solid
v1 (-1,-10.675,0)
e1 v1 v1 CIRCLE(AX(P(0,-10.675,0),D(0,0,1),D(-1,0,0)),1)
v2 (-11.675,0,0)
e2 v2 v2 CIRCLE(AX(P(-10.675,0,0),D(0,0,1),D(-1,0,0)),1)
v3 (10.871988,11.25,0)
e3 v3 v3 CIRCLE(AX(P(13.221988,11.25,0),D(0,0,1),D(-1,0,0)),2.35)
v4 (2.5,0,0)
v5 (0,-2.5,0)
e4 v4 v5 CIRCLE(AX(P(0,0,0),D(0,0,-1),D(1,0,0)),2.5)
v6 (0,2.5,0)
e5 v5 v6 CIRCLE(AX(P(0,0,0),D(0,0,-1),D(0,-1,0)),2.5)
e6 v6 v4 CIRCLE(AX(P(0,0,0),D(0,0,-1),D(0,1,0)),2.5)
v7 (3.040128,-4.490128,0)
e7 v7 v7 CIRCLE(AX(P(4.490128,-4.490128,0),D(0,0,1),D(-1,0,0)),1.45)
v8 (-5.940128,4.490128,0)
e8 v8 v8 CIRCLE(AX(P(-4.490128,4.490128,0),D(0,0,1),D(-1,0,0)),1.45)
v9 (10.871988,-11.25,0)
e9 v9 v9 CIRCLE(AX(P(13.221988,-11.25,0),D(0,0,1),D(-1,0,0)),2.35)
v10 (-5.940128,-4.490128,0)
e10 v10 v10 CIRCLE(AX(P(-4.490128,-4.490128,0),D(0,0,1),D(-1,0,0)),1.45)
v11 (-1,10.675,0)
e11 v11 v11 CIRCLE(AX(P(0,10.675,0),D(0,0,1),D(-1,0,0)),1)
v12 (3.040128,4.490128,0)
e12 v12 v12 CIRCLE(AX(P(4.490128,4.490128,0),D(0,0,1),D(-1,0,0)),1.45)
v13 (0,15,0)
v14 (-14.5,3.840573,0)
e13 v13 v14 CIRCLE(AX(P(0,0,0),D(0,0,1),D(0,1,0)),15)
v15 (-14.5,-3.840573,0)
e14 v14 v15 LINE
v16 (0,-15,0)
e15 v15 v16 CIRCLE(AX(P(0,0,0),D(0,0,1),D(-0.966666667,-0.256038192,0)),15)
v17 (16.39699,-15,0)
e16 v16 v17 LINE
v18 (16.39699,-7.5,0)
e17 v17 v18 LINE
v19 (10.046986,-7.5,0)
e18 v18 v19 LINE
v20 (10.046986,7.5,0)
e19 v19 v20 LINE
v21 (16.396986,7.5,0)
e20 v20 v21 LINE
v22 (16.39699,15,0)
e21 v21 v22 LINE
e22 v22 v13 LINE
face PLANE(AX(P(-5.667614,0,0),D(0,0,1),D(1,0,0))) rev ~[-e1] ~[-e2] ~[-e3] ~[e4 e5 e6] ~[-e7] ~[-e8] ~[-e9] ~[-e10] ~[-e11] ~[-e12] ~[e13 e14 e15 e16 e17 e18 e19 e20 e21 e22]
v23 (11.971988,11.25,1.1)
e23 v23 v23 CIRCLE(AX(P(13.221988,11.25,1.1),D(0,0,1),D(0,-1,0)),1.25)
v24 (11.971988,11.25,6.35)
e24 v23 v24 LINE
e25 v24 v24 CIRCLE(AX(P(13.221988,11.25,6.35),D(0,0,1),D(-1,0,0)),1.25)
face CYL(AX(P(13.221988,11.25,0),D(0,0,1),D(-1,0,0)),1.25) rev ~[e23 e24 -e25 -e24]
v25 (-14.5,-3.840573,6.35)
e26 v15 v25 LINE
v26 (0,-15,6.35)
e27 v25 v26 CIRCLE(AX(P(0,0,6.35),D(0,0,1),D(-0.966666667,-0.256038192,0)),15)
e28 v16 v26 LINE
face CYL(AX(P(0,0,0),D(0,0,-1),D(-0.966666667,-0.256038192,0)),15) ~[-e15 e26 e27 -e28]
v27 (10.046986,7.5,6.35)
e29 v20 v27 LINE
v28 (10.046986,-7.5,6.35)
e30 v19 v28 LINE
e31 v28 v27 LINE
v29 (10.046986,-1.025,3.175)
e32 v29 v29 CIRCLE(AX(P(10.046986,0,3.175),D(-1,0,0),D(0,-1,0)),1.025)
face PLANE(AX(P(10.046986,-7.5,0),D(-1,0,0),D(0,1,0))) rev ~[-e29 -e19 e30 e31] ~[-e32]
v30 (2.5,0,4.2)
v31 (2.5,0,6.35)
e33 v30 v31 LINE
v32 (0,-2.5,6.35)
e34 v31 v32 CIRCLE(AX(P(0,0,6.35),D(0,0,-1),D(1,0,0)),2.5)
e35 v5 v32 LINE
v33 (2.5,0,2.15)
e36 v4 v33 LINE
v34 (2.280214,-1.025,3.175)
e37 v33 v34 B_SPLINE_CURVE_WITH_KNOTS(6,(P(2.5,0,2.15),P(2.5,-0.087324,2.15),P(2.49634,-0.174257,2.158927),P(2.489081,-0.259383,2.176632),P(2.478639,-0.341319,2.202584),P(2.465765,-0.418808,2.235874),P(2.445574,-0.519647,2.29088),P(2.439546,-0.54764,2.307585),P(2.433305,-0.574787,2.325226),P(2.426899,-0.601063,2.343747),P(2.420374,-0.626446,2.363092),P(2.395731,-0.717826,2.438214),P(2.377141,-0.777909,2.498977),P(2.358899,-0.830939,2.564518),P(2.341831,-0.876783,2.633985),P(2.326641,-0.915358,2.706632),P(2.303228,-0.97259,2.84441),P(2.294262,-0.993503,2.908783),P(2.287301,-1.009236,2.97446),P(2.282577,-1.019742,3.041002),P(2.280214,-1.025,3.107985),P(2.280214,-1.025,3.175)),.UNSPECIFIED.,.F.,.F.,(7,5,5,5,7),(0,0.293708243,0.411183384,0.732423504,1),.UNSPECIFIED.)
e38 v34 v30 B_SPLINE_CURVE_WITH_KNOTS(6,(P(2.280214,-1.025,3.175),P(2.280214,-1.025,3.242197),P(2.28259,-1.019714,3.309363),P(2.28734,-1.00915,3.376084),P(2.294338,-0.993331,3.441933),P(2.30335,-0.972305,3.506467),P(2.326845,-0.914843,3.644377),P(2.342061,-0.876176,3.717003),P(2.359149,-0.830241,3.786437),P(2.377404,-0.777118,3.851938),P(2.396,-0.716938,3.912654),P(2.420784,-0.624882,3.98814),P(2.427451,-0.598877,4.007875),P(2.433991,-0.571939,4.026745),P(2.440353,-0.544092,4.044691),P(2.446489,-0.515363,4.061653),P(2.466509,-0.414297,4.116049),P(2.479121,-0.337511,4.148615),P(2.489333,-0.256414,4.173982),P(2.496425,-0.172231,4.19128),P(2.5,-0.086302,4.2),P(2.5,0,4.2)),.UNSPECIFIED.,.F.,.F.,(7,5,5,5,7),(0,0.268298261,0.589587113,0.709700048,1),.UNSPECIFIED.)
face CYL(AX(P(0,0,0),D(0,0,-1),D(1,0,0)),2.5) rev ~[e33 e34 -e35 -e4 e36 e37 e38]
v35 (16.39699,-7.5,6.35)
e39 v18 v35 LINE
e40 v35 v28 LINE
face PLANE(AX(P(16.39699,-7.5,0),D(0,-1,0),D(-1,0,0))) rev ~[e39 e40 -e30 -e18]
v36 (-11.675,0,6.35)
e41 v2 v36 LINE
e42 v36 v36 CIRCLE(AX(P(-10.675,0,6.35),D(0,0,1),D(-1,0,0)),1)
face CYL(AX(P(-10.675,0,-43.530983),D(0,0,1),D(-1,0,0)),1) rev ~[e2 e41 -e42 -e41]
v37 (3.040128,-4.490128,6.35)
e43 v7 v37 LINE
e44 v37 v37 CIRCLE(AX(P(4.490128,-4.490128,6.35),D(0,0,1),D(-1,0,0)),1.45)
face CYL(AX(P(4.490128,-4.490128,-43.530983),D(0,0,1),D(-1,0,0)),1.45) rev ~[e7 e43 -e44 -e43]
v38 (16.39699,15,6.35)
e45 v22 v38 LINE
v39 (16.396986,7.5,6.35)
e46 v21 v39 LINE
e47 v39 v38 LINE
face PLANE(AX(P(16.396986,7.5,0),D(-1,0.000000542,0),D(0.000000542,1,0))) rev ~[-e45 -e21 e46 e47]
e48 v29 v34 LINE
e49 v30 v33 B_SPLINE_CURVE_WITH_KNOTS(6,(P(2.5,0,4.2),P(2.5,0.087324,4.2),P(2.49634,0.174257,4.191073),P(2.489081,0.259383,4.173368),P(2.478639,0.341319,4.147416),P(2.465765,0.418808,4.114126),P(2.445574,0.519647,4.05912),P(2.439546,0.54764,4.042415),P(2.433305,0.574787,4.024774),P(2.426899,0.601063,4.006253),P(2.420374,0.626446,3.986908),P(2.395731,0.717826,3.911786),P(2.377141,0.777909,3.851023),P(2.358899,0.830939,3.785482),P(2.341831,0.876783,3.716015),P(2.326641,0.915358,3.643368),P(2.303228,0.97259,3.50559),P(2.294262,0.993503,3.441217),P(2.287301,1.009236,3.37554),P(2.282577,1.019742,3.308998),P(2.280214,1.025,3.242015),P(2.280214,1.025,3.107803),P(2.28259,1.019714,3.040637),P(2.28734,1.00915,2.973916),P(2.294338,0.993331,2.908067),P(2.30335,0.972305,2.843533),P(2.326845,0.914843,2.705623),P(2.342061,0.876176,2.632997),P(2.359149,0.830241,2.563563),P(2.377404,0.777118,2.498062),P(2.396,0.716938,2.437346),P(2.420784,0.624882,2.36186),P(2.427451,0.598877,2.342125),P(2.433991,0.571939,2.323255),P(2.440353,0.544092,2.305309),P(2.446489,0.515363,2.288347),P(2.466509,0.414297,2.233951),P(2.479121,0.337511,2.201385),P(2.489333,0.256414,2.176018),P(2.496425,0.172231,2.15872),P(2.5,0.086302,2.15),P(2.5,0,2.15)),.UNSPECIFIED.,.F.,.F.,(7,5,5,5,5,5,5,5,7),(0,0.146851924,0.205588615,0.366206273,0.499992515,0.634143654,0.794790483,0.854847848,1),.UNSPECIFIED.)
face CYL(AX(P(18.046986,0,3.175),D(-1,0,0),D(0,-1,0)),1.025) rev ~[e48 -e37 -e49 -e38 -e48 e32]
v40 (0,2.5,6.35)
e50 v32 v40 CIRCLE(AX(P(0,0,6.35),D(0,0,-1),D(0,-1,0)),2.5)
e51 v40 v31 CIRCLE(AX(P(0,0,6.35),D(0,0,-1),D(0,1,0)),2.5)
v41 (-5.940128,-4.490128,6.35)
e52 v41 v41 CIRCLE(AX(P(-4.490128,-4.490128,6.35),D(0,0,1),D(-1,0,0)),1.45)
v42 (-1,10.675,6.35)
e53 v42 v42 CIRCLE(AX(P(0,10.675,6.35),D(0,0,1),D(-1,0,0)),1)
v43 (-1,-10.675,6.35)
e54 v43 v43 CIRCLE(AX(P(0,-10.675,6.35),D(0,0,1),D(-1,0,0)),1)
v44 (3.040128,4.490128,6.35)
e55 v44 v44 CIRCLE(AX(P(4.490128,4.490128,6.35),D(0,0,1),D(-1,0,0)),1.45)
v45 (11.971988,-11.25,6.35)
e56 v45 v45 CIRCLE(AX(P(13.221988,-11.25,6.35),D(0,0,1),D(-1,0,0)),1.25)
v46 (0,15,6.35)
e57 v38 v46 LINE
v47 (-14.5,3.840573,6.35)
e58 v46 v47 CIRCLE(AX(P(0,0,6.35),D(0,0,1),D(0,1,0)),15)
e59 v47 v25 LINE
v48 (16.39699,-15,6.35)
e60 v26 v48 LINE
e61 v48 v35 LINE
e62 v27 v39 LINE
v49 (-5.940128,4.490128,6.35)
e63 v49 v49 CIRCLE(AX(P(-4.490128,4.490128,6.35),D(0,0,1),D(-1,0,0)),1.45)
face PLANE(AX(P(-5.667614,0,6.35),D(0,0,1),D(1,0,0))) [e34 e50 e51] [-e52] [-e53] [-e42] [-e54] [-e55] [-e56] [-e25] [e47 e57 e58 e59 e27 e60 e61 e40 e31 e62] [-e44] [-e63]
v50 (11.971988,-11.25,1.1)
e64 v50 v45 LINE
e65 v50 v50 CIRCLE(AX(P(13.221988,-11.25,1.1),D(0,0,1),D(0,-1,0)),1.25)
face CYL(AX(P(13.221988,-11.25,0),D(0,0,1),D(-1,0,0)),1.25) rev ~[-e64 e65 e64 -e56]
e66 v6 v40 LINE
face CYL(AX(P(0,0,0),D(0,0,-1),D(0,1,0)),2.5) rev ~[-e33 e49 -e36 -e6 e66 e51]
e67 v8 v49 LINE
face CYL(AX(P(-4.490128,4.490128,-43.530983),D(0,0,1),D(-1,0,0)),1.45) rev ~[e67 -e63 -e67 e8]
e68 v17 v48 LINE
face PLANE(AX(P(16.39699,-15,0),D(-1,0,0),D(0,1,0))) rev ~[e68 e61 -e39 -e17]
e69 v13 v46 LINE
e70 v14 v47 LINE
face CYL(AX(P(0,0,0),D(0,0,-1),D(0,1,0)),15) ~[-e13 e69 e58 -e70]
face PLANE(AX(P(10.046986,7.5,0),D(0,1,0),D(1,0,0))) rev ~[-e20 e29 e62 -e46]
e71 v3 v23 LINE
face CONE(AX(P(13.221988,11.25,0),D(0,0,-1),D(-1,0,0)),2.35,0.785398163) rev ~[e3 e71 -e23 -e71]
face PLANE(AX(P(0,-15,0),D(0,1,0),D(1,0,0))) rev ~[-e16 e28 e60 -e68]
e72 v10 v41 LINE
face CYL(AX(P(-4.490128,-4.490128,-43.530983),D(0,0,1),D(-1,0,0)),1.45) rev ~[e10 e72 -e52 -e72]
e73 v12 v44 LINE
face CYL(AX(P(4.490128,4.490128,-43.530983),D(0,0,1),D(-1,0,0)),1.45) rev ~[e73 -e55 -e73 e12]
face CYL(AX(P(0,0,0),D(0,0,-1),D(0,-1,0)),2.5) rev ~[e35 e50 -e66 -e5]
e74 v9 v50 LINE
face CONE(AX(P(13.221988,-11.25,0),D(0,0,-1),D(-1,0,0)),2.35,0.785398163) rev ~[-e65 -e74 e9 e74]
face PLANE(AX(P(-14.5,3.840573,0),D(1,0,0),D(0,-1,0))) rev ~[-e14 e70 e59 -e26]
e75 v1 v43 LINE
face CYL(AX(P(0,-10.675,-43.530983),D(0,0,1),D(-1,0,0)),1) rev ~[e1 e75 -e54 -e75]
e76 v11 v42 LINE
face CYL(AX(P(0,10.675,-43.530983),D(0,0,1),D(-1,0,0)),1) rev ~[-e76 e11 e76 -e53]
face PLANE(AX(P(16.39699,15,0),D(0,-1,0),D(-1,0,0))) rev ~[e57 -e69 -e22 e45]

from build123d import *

# Parameters (mm, degrees)
F1_DEPTH       = 6.35
F2_D           = 2.5
F2_CSINK_D     = 4.7
F2_CSINK_ANGLE = 90
F3_D           = 2.9
F4_D           = 2
F6_D           = 2.05
F6_DEPTH       = 8
F6_TIP         = 0.6158821345


# Not quite as in the source:
# - ends of sketch curves that miss each other by under 0.0002 mm in the source are joined
# - a length typed as a fraction of an inch, garbled in the dataset ("3 / 203.2 mm" for 3/8 in), is restored


with BuildPart() as f1:
    # F0 (on Top) → F1 (new body)
    with BuildSketch(Plane.XY):
        with BuildLine():
            ThreePointArc((0, -2.5), (-2.5, 0), (0, 2.5))
            Line((0, 2.5), (0, 6.35))
            Line((0, 6.35), (0, 15))
            ThreePointArc((0, 15), (-9.1485355902, 11.8871483777), (-14.5, 3.8405728739))
            Line((-14.5, 3.8405728739), (-14.5, -3.8405728739))
            ThreePointArc((-14.5, -3.8405728739), (-9.1485355902, -11.8871483777), (0, -15))
            Line((0, -15), (0, -2.5))
        make_face()
        with BuildLine():
            ThreePointArc((0, 2.5), (1.767766953, 1.767766953), (2.5, 0))
            ThreePointArc((2.5, 0), (1.767766953, -1.767766953), (0, -2.5))
            Line((0, -2.5), (0, -15))
            Line((0, -15), (16.39699, -15))
            Line((16.39699, -15), (16.39699, -7.5))
            Line((16.39699, -7.5), (10.0469859317, -7.5))
            Line((10.0469859317, -7.5), (10.0469859317, 7.5))
            Line((10.0469859317, 7.5), (16.3969859317, 7.5))
            Line((16.3969859317, 7.5), (16.39699, 15))
            Line((16.39699, 15), (0, 15))
            Line((0, 15), (0, 6.35))
            Line((0, 6.35), (0, 2.5))
        make_face()
    extrude(amount=F1_DEPTH)

    # F2 (through all)
    with Locations(Plane(origin=(0, 0, 0), x_dir=(1, 0, 0), z_dir=(0, 0, -1))):
        with Locations((13.2219879658, -11.25), (13.2219879658, 11.25)):
            CounterSinkHole(F2_D / 2, F2_CSINK_D / 2, counter_sink_angle=F2_CSINK_ANGLE)

    # F3 (through all)
    with Locations(Plane(origin=(0, 0, 0), x_dir=(1, 0, 0), z_dir=(0, 0, -1))):
        with Locations((-4.4901280605, -4.4901280605), (4.4901280605, -4.4901280605), (4.4901280605, 4.4901280605), (-4.4901280605, 4.4901280605)):
            Hole(F3_D / 2)

    # F4 (through all)
    with Locations(Plane(origin=(0, 0, 0), x_dir=(1, 0, 0), z_dir=(0, 0, -1))):
        with Locations((0, -10.675), (-10.675, 0), (0, 10.675)):
            Hole(F4_D / 2)

    # F6
    with Locations(Plane.YZ.offset(10.0469859317)):
        with Locations((0, 3.175)):
            Hole(F6_D / 2, depth=F6_DEPTH)
            with Locations((0, 0, -(F6_DEPTH + F6_TIP / 2))):  # 118° drill point
                Cone(0, F6_D / 2, F6_TIP, mode=Mode.SUBTRACT)


solid = f1.part
